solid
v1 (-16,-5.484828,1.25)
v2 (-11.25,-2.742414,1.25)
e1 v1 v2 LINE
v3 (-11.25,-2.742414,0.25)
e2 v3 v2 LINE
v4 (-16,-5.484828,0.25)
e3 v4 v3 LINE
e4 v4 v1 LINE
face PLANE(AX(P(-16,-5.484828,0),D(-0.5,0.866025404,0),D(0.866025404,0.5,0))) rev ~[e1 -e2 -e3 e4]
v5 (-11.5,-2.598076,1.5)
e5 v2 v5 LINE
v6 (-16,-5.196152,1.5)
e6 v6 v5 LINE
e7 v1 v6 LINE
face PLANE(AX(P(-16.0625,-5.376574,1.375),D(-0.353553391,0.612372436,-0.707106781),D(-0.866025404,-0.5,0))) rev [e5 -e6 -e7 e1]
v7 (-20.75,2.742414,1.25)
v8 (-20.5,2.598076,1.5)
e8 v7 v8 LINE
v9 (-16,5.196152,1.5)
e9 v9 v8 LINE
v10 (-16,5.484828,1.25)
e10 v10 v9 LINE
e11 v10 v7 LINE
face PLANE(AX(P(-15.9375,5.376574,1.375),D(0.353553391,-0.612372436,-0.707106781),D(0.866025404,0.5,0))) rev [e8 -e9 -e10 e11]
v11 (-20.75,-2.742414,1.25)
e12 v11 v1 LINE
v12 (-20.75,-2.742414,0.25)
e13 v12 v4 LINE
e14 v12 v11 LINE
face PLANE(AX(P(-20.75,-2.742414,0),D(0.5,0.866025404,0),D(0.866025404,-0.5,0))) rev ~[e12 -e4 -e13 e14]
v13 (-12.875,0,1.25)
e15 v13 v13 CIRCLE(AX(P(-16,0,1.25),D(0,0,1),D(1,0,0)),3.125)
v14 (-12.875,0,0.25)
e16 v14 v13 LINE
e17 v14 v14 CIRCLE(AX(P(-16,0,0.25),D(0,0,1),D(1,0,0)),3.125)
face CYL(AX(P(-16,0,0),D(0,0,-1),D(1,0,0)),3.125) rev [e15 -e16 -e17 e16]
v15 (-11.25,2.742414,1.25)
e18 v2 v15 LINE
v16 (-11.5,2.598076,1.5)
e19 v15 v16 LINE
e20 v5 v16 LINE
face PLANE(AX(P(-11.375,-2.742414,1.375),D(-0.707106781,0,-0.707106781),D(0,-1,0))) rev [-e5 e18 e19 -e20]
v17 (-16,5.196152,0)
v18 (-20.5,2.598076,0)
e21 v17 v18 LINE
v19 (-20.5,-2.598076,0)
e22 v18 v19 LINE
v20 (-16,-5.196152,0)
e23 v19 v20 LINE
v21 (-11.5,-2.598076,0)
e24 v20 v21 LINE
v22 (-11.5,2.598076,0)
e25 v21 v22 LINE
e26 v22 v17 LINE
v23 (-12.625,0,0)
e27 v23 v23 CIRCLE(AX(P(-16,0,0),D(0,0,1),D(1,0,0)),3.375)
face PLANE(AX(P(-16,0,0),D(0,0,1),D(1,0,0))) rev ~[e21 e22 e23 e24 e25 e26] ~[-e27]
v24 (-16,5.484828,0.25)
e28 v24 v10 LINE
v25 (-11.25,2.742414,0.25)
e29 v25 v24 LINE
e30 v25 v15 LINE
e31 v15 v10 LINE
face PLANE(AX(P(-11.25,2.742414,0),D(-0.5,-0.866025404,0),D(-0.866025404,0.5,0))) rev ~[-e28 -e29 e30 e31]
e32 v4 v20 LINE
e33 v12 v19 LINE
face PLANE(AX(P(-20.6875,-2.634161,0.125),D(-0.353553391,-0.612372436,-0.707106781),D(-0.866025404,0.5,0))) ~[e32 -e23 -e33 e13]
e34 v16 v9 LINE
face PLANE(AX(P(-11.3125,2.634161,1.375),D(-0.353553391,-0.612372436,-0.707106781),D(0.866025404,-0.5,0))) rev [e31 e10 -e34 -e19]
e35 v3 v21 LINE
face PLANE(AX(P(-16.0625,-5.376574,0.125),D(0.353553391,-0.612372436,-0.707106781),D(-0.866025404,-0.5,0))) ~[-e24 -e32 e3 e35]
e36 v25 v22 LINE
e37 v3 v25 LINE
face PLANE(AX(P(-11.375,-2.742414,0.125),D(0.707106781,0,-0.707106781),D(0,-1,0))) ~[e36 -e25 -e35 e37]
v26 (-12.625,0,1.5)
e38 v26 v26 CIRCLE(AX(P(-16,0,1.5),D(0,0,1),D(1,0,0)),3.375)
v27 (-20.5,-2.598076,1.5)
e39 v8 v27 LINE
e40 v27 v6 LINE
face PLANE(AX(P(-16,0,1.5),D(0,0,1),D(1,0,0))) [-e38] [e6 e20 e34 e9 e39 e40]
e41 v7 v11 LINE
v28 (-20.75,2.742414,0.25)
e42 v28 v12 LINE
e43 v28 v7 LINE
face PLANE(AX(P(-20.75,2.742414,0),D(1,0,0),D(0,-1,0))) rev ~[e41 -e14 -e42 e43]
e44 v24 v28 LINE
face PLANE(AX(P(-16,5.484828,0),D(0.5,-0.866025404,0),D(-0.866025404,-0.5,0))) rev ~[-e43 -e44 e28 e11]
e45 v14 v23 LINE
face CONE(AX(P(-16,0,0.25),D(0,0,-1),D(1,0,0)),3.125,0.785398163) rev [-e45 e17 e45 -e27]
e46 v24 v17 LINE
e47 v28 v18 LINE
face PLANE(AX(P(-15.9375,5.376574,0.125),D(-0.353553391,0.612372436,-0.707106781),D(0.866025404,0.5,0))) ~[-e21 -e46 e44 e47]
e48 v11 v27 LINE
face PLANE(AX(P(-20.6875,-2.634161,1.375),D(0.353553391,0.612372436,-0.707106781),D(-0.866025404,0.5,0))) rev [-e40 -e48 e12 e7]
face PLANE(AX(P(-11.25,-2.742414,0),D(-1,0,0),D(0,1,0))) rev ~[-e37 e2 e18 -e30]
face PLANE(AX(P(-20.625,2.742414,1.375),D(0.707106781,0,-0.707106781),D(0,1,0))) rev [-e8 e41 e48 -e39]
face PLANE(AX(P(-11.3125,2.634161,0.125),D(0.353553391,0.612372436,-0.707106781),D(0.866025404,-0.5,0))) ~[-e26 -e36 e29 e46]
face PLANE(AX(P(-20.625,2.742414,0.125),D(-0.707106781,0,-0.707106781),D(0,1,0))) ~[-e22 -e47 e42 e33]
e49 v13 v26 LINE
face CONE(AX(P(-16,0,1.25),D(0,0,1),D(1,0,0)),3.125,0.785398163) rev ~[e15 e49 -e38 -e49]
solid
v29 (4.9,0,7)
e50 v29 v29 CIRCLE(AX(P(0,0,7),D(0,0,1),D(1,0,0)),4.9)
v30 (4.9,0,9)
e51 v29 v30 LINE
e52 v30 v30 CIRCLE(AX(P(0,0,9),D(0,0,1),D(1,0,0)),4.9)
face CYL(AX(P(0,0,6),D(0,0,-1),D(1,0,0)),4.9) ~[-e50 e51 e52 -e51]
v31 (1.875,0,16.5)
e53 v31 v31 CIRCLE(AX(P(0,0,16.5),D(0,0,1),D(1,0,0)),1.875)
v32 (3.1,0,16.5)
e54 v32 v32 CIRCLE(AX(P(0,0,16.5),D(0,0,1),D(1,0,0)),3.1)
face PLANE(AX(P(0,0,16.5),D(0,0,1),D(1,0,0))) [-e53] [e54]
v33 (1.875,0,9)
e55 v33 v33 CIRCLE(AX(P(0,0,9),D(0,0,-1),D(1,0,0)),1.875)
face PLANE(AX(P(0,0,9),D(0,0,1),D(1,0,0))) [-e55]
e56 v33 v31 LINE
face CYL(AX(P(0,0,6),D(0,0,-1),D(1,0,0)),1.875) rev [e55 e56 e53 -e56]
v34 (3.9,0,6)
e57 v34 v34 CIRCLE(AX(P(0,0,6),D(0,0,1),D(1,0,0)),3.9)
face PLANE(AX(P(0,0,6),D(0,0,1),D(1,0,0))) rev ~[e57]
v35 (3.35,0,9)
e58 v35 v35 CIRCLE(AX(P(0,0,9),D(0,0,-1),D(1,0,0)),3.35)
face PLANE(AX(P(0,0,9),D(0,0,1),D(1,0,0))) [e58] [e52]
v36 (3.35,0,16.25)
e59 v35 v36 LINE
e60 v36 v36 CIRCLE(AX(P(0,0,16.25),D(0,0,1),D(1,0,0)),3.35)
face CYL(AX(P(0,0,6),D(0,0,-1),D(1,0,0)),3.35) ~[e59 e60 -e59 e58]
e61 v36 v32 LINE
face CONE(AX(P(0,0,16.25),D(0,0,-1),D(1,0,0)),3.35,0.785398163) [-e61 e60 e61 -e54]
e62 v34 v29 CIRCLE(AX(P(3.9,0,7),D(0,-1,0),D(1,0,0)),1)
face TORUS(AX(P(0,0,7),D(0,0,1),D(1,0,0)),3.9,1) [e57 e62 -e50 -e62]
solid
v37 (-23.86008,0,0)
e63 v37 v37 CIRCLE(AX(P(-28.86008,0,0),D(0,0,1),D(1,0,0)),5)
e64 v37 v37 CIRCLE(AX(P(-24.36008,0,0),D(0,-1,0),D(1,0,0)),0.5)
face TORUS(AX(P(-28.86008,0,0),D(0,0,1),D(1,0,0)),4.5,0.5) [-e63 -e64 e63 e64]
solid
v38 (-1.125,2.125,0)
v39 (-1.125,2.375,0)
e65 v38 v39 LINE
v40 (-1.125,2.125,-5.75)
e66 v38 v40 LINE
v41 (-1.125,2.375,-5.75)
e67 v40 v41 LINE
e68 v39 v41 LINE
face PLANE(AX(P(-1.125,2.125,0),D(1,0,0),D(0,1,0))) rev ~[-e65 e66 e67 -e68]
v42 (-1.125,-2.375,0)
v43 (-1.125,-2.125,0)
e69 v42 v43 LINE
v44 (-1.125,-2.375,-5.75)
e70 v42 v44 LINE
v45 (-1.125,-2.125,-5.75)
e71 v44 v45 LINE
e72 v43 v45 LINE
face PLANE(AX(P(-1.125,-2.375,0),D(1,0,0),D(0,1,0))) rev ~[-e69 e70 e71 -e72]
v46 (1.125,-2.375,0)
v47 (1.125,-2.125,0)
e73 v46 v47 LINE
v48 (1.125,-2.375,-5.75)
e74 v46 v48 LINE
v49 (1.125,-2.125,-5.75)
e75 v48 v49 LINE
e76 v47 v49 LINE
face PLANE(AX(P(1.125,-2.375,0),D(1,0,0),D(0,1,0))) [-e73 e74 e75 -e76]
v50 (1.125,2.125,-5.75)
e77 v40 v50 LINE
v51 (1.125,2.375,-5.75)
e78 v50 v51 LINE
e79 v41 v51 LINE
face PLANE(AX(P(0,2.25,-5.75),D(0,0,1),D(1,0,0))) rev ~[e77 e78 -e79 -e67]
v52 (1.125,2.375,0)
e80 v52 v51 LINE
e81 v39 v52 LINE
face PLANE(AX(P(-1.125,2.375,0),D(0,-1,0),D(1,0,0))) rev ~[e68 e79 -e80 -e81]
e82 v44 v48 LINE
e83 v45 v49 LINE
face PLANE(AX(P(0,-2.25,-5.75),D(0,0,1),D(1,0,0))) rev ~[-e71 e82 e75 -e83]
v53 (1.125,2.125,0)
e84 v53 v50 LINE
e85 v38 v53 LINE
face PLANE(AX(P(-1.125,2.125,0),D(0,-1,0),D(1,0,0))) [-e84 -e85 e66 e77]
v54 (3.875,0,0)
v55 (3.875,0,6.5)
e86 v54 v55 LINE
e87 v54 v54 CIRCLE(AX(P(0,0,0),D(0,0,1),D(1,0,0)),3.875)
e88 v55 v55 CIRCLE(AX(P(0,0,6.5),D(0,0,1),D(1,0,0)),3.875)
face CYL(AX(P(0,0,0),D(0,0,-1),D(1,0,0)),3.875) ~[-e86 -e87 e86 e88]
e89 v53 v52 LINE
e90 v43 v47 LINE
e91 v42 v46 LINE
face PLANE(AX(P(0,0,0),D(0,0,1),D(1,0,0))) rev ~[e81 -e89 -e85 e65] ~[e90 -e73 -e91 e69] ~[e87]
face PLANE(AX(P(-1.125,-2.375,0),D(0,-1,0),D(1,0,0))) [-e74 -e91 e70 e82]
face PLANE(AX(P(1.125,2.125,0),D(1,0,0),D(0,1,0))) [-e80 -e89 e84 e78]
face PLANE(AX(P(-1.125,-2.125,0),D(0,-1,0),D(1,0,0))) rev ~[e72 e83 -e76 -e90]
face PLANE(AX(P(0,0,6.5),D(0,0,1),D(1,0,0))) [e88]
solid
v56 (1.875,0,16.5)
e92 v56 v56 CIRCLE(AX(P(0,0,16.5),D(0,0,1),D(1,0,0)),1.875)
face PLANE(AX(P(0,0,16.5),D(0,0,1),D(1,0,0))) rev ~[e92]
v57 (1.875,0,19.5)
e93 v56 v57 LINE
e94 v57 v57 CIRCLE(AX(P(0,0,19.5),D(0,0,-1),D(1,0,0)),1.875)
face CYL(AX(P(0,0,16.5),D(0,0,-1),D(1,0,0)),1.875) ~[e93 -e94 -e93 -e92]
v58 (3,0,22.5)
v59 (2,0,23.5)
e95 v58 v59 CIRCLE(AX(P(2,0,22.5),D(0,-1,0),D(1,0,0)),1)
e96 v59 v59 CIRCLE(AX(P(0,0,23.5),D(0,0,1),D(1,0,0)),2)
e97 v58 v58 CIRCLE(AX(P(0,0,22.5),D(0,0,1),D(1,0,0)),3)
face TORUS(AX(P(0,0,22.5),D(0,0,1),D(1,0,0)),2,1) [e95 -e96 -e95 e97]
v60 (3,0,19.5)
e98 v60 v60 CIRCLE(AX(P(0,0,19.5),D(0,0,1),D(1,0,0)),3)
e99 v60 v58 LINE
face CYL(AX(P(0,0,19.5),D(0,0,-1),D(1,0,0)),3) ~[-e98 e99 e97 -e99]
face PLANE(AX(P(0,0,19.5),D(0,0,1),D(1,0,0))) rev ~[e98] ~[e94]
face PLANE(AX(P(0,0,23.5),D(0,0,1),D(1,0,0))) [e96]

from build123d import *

# Parameters (mm, degrees)
F0_R      = 3.875
F0_R_2    = 3.35
F0_R_3    = 3
F0_W      = 2.25
F0_H      = 0.25
F0_R_4    = 1.875
F1_DEPTH  = 6.5
F2_START  = 6
F0_R_5    = 4.9
F2_DEPTH  = 3
F3_START  = 6
F3_DEPTH  = 10.5
F4_START  = 16.5
F4_DEPTH  = 7
F5_START  = 19.5
F5_DEPTH  = 4
F6_R      = 1
F7_R      = 1
F8_SIZE   = 0.25
F9_DEPTH  = 5.75
F10_R     = 3.125
F11_DEPTH = 1.5
F12_SIZE  = 0.25
F13_R     = 0.5


with BuildPart() as f1:
    # F0 (on Top) → F1 (new body)
    with BuildSketch(Plane.XY):
        Circle(F0_R)
        Circle(F0_R_2, mode=Mode.SUBTRACT)
        Circle(F0_R_2)
        Circle(F0_R_3, mode=Mode.SUBTRACT)
        Circle(F0_R_3)
        with Locations((0, -2.25)):
            Rectangle(F0_W, F0_H, mode=Mode.SUBTRACT)
        Circle(F0_R_4, mode=Mode.SUBTRACT)
        with Locations((0, 2.25)):
            Rectangle(F0_W, F0_H, mode=Mode.SUBTRACT)
        Circle(F0_R_4)
        with Locations((0, 2.25)):
            Rectangle(F0_W, F0_H)
        with Locations((0, -2.25)):
            Rectangle(F0_W, F0_H)
    extrude(amount=F1_DEPTH)

    # F0 (on Top) → F9 (join)
    with BuildSketch(Plane.XY):
        with Locations((0, 2.25)):
            Rectangle(F0_W, F0_H)
        with Locations((0, -2.25)):
            Rectangle(F0_W, F0_H)
    extrude(amount=-F9_DEPTH)


with BuildPart() as f2:
    # F0 (on Top) → F2 (new body)
    with BuildSketch(Plane.XY.offset(F2_START)):
        Circle(F0_R_5)
        Circle(F0_R, mode=Mode.SUBTRACT)
        Circle(F0_R)
        Circle(F0_R_2, mode=Mode.SUBTRACT)
        Circle(F0_R_2)
        Circle(F0_R_3, mode=Mode.SUBTRACT)
        Circle(F0_R_3)
        with Locations((0, -2.25)):
            Rectangle(F0_W, F0_H, mode=Mode.SUBTRACT)
        Circle(F0_R_4, mode=Mode.SUBTRACT)
        with Locations((0, 2.25)):
            Rectangle(F0_W, F0_H, mode=Mode.SUBTRACT)
        Circle(F0_R_4)
    extrude(amount=F2_DEPTH)

    # F0 (on Top) → F3 (join)
    with BuildSketch(Plane.XY.offset(F3_START)):
        Circle(F0_R_2)
        Circle(F0_R_3, mode=Mode.SUBTRACT)
        Circle(F0_R_3)
        with Locations((0, -2.25)):
            Rectangle(F0_W, F0_H, mode=Mode.SUBTRACT)
        Circle(F0_R_4, mode=Mode.SUBTRACT)
        with Locations((0, 2.25)):
            Rectangle(F0_W, F0_H, mode=Mode.SUBTRACT)
        with Locations((0, 2.25)):
            Rectangle(F0_W, F0_H)
        with Locations((0, -2.25)):
            Rectangle(F0_W, F0_H)
    extrude(amount=F3_DEPTH)

    # F7
    f7_edges = [f2.edges().sort_by_distance(p)[0] for p in [
        (-4.9, 0, 6),
    ]]
    fillet(f7_edges, radius=F7_R)

    # F8
    f8_edges = [f2.edges().sort_by_distance(p)[0] for p in [
        (-3.35, 0, 16.5),
    ]]
    chamfer(f8_edges, length=F8_SIZE)


with BuildPart() as f4:
    # F0 (on Top) → F4 (new body)
    with BuildSketch(Plane.XY.offset(F4_START)):
        Circle(F0_R_4)
    extrude(amount=F4_DEPTH)

    # F0 (on Top) → F5 (join)
    with BuildSketch(Plane.XY.offset(F5_START)):
        Circle(F0_R_3)
        with Locations((0, -2.25)):
            Rectangle(F0_W, F0_H, mode=Mode.SUBTRACT)
        Circle(F0_R_4, mode=Mode.SUBTRACT)
        with Locations((0, 2.25)):
            Rectangle(F0_W, F0_H, mode=Mode.SUBTRACT)
        Circle(F0_R_4)
        with Locations((0, -2.25)):
            Rectangle(F0_W, F0_H)
        with Locations((0, 2.25)):
            Rectangle(F0_W, F0_H)
    extrude(amount=F5_DEPTH)

    # F6
    f6_edges = [f4.edges().sort_by_distance(p)[0] for p in [
        (-3, 0, 23.5),
    ]]
    fillet(f6_edges, radius=F6_R)


with BuildPart() as f11:
    # F10 (on Top) → F11 (new body)
    with BuildSketch(Plane.XY):
        Polygon((-20.75, 2.7424137787), (-20.75, -2.7424137787), (-16, -5.4848275573), (-11.25, -2.7424137787), (-11.25, 2.7424137787), (-16, 5.4848275573), align=None)
        with Locations((-16, 0)):
            Circle(F10_R, mode=Mode.SUBTRACT)
    extrude(amount=F11_DEPTH)

    # F12
    f12_edges = [f11.edges().sort_by_distance(p)[0] for p in [
        (-20.75, 0, 1.5),
        (-18.375, -4.113621, 1.5),
        (-13.625, -4.113621, 1.5),
        (-11.25, 0, 1.5),
        (-13.625, 4.113621, 1.5),
        (-18.375, 4.113621, 1.5),
        (-19.125, 0, 1.5),
        (-20.75, 0, 0),
        (-18.375, -4.113621, 0),
        (-13.625, -4.113621, 0),
        (-11.25, 0, 0),
        (-13.625, 4.113621, 0),
        (-18.375, 4.113621, 0),
        (-19.125, 0, 0),
    ]]
    chamfer(f12_edges, length=F12_SIZE)


with BuildPart() as f15:
    # F13 (on Front) → F15 (revolve)
    with BuildSketch(Plane.XZ):
        with Locations((-24.3600804166, 0)):
            Circle(F13_R)
    revolve(axis=Axis((-28.8600804166, 0, 0), (0, 0, 1)))


solid = Compound([f1.part, f2.part, f4.part, f11.part, f15.part])
